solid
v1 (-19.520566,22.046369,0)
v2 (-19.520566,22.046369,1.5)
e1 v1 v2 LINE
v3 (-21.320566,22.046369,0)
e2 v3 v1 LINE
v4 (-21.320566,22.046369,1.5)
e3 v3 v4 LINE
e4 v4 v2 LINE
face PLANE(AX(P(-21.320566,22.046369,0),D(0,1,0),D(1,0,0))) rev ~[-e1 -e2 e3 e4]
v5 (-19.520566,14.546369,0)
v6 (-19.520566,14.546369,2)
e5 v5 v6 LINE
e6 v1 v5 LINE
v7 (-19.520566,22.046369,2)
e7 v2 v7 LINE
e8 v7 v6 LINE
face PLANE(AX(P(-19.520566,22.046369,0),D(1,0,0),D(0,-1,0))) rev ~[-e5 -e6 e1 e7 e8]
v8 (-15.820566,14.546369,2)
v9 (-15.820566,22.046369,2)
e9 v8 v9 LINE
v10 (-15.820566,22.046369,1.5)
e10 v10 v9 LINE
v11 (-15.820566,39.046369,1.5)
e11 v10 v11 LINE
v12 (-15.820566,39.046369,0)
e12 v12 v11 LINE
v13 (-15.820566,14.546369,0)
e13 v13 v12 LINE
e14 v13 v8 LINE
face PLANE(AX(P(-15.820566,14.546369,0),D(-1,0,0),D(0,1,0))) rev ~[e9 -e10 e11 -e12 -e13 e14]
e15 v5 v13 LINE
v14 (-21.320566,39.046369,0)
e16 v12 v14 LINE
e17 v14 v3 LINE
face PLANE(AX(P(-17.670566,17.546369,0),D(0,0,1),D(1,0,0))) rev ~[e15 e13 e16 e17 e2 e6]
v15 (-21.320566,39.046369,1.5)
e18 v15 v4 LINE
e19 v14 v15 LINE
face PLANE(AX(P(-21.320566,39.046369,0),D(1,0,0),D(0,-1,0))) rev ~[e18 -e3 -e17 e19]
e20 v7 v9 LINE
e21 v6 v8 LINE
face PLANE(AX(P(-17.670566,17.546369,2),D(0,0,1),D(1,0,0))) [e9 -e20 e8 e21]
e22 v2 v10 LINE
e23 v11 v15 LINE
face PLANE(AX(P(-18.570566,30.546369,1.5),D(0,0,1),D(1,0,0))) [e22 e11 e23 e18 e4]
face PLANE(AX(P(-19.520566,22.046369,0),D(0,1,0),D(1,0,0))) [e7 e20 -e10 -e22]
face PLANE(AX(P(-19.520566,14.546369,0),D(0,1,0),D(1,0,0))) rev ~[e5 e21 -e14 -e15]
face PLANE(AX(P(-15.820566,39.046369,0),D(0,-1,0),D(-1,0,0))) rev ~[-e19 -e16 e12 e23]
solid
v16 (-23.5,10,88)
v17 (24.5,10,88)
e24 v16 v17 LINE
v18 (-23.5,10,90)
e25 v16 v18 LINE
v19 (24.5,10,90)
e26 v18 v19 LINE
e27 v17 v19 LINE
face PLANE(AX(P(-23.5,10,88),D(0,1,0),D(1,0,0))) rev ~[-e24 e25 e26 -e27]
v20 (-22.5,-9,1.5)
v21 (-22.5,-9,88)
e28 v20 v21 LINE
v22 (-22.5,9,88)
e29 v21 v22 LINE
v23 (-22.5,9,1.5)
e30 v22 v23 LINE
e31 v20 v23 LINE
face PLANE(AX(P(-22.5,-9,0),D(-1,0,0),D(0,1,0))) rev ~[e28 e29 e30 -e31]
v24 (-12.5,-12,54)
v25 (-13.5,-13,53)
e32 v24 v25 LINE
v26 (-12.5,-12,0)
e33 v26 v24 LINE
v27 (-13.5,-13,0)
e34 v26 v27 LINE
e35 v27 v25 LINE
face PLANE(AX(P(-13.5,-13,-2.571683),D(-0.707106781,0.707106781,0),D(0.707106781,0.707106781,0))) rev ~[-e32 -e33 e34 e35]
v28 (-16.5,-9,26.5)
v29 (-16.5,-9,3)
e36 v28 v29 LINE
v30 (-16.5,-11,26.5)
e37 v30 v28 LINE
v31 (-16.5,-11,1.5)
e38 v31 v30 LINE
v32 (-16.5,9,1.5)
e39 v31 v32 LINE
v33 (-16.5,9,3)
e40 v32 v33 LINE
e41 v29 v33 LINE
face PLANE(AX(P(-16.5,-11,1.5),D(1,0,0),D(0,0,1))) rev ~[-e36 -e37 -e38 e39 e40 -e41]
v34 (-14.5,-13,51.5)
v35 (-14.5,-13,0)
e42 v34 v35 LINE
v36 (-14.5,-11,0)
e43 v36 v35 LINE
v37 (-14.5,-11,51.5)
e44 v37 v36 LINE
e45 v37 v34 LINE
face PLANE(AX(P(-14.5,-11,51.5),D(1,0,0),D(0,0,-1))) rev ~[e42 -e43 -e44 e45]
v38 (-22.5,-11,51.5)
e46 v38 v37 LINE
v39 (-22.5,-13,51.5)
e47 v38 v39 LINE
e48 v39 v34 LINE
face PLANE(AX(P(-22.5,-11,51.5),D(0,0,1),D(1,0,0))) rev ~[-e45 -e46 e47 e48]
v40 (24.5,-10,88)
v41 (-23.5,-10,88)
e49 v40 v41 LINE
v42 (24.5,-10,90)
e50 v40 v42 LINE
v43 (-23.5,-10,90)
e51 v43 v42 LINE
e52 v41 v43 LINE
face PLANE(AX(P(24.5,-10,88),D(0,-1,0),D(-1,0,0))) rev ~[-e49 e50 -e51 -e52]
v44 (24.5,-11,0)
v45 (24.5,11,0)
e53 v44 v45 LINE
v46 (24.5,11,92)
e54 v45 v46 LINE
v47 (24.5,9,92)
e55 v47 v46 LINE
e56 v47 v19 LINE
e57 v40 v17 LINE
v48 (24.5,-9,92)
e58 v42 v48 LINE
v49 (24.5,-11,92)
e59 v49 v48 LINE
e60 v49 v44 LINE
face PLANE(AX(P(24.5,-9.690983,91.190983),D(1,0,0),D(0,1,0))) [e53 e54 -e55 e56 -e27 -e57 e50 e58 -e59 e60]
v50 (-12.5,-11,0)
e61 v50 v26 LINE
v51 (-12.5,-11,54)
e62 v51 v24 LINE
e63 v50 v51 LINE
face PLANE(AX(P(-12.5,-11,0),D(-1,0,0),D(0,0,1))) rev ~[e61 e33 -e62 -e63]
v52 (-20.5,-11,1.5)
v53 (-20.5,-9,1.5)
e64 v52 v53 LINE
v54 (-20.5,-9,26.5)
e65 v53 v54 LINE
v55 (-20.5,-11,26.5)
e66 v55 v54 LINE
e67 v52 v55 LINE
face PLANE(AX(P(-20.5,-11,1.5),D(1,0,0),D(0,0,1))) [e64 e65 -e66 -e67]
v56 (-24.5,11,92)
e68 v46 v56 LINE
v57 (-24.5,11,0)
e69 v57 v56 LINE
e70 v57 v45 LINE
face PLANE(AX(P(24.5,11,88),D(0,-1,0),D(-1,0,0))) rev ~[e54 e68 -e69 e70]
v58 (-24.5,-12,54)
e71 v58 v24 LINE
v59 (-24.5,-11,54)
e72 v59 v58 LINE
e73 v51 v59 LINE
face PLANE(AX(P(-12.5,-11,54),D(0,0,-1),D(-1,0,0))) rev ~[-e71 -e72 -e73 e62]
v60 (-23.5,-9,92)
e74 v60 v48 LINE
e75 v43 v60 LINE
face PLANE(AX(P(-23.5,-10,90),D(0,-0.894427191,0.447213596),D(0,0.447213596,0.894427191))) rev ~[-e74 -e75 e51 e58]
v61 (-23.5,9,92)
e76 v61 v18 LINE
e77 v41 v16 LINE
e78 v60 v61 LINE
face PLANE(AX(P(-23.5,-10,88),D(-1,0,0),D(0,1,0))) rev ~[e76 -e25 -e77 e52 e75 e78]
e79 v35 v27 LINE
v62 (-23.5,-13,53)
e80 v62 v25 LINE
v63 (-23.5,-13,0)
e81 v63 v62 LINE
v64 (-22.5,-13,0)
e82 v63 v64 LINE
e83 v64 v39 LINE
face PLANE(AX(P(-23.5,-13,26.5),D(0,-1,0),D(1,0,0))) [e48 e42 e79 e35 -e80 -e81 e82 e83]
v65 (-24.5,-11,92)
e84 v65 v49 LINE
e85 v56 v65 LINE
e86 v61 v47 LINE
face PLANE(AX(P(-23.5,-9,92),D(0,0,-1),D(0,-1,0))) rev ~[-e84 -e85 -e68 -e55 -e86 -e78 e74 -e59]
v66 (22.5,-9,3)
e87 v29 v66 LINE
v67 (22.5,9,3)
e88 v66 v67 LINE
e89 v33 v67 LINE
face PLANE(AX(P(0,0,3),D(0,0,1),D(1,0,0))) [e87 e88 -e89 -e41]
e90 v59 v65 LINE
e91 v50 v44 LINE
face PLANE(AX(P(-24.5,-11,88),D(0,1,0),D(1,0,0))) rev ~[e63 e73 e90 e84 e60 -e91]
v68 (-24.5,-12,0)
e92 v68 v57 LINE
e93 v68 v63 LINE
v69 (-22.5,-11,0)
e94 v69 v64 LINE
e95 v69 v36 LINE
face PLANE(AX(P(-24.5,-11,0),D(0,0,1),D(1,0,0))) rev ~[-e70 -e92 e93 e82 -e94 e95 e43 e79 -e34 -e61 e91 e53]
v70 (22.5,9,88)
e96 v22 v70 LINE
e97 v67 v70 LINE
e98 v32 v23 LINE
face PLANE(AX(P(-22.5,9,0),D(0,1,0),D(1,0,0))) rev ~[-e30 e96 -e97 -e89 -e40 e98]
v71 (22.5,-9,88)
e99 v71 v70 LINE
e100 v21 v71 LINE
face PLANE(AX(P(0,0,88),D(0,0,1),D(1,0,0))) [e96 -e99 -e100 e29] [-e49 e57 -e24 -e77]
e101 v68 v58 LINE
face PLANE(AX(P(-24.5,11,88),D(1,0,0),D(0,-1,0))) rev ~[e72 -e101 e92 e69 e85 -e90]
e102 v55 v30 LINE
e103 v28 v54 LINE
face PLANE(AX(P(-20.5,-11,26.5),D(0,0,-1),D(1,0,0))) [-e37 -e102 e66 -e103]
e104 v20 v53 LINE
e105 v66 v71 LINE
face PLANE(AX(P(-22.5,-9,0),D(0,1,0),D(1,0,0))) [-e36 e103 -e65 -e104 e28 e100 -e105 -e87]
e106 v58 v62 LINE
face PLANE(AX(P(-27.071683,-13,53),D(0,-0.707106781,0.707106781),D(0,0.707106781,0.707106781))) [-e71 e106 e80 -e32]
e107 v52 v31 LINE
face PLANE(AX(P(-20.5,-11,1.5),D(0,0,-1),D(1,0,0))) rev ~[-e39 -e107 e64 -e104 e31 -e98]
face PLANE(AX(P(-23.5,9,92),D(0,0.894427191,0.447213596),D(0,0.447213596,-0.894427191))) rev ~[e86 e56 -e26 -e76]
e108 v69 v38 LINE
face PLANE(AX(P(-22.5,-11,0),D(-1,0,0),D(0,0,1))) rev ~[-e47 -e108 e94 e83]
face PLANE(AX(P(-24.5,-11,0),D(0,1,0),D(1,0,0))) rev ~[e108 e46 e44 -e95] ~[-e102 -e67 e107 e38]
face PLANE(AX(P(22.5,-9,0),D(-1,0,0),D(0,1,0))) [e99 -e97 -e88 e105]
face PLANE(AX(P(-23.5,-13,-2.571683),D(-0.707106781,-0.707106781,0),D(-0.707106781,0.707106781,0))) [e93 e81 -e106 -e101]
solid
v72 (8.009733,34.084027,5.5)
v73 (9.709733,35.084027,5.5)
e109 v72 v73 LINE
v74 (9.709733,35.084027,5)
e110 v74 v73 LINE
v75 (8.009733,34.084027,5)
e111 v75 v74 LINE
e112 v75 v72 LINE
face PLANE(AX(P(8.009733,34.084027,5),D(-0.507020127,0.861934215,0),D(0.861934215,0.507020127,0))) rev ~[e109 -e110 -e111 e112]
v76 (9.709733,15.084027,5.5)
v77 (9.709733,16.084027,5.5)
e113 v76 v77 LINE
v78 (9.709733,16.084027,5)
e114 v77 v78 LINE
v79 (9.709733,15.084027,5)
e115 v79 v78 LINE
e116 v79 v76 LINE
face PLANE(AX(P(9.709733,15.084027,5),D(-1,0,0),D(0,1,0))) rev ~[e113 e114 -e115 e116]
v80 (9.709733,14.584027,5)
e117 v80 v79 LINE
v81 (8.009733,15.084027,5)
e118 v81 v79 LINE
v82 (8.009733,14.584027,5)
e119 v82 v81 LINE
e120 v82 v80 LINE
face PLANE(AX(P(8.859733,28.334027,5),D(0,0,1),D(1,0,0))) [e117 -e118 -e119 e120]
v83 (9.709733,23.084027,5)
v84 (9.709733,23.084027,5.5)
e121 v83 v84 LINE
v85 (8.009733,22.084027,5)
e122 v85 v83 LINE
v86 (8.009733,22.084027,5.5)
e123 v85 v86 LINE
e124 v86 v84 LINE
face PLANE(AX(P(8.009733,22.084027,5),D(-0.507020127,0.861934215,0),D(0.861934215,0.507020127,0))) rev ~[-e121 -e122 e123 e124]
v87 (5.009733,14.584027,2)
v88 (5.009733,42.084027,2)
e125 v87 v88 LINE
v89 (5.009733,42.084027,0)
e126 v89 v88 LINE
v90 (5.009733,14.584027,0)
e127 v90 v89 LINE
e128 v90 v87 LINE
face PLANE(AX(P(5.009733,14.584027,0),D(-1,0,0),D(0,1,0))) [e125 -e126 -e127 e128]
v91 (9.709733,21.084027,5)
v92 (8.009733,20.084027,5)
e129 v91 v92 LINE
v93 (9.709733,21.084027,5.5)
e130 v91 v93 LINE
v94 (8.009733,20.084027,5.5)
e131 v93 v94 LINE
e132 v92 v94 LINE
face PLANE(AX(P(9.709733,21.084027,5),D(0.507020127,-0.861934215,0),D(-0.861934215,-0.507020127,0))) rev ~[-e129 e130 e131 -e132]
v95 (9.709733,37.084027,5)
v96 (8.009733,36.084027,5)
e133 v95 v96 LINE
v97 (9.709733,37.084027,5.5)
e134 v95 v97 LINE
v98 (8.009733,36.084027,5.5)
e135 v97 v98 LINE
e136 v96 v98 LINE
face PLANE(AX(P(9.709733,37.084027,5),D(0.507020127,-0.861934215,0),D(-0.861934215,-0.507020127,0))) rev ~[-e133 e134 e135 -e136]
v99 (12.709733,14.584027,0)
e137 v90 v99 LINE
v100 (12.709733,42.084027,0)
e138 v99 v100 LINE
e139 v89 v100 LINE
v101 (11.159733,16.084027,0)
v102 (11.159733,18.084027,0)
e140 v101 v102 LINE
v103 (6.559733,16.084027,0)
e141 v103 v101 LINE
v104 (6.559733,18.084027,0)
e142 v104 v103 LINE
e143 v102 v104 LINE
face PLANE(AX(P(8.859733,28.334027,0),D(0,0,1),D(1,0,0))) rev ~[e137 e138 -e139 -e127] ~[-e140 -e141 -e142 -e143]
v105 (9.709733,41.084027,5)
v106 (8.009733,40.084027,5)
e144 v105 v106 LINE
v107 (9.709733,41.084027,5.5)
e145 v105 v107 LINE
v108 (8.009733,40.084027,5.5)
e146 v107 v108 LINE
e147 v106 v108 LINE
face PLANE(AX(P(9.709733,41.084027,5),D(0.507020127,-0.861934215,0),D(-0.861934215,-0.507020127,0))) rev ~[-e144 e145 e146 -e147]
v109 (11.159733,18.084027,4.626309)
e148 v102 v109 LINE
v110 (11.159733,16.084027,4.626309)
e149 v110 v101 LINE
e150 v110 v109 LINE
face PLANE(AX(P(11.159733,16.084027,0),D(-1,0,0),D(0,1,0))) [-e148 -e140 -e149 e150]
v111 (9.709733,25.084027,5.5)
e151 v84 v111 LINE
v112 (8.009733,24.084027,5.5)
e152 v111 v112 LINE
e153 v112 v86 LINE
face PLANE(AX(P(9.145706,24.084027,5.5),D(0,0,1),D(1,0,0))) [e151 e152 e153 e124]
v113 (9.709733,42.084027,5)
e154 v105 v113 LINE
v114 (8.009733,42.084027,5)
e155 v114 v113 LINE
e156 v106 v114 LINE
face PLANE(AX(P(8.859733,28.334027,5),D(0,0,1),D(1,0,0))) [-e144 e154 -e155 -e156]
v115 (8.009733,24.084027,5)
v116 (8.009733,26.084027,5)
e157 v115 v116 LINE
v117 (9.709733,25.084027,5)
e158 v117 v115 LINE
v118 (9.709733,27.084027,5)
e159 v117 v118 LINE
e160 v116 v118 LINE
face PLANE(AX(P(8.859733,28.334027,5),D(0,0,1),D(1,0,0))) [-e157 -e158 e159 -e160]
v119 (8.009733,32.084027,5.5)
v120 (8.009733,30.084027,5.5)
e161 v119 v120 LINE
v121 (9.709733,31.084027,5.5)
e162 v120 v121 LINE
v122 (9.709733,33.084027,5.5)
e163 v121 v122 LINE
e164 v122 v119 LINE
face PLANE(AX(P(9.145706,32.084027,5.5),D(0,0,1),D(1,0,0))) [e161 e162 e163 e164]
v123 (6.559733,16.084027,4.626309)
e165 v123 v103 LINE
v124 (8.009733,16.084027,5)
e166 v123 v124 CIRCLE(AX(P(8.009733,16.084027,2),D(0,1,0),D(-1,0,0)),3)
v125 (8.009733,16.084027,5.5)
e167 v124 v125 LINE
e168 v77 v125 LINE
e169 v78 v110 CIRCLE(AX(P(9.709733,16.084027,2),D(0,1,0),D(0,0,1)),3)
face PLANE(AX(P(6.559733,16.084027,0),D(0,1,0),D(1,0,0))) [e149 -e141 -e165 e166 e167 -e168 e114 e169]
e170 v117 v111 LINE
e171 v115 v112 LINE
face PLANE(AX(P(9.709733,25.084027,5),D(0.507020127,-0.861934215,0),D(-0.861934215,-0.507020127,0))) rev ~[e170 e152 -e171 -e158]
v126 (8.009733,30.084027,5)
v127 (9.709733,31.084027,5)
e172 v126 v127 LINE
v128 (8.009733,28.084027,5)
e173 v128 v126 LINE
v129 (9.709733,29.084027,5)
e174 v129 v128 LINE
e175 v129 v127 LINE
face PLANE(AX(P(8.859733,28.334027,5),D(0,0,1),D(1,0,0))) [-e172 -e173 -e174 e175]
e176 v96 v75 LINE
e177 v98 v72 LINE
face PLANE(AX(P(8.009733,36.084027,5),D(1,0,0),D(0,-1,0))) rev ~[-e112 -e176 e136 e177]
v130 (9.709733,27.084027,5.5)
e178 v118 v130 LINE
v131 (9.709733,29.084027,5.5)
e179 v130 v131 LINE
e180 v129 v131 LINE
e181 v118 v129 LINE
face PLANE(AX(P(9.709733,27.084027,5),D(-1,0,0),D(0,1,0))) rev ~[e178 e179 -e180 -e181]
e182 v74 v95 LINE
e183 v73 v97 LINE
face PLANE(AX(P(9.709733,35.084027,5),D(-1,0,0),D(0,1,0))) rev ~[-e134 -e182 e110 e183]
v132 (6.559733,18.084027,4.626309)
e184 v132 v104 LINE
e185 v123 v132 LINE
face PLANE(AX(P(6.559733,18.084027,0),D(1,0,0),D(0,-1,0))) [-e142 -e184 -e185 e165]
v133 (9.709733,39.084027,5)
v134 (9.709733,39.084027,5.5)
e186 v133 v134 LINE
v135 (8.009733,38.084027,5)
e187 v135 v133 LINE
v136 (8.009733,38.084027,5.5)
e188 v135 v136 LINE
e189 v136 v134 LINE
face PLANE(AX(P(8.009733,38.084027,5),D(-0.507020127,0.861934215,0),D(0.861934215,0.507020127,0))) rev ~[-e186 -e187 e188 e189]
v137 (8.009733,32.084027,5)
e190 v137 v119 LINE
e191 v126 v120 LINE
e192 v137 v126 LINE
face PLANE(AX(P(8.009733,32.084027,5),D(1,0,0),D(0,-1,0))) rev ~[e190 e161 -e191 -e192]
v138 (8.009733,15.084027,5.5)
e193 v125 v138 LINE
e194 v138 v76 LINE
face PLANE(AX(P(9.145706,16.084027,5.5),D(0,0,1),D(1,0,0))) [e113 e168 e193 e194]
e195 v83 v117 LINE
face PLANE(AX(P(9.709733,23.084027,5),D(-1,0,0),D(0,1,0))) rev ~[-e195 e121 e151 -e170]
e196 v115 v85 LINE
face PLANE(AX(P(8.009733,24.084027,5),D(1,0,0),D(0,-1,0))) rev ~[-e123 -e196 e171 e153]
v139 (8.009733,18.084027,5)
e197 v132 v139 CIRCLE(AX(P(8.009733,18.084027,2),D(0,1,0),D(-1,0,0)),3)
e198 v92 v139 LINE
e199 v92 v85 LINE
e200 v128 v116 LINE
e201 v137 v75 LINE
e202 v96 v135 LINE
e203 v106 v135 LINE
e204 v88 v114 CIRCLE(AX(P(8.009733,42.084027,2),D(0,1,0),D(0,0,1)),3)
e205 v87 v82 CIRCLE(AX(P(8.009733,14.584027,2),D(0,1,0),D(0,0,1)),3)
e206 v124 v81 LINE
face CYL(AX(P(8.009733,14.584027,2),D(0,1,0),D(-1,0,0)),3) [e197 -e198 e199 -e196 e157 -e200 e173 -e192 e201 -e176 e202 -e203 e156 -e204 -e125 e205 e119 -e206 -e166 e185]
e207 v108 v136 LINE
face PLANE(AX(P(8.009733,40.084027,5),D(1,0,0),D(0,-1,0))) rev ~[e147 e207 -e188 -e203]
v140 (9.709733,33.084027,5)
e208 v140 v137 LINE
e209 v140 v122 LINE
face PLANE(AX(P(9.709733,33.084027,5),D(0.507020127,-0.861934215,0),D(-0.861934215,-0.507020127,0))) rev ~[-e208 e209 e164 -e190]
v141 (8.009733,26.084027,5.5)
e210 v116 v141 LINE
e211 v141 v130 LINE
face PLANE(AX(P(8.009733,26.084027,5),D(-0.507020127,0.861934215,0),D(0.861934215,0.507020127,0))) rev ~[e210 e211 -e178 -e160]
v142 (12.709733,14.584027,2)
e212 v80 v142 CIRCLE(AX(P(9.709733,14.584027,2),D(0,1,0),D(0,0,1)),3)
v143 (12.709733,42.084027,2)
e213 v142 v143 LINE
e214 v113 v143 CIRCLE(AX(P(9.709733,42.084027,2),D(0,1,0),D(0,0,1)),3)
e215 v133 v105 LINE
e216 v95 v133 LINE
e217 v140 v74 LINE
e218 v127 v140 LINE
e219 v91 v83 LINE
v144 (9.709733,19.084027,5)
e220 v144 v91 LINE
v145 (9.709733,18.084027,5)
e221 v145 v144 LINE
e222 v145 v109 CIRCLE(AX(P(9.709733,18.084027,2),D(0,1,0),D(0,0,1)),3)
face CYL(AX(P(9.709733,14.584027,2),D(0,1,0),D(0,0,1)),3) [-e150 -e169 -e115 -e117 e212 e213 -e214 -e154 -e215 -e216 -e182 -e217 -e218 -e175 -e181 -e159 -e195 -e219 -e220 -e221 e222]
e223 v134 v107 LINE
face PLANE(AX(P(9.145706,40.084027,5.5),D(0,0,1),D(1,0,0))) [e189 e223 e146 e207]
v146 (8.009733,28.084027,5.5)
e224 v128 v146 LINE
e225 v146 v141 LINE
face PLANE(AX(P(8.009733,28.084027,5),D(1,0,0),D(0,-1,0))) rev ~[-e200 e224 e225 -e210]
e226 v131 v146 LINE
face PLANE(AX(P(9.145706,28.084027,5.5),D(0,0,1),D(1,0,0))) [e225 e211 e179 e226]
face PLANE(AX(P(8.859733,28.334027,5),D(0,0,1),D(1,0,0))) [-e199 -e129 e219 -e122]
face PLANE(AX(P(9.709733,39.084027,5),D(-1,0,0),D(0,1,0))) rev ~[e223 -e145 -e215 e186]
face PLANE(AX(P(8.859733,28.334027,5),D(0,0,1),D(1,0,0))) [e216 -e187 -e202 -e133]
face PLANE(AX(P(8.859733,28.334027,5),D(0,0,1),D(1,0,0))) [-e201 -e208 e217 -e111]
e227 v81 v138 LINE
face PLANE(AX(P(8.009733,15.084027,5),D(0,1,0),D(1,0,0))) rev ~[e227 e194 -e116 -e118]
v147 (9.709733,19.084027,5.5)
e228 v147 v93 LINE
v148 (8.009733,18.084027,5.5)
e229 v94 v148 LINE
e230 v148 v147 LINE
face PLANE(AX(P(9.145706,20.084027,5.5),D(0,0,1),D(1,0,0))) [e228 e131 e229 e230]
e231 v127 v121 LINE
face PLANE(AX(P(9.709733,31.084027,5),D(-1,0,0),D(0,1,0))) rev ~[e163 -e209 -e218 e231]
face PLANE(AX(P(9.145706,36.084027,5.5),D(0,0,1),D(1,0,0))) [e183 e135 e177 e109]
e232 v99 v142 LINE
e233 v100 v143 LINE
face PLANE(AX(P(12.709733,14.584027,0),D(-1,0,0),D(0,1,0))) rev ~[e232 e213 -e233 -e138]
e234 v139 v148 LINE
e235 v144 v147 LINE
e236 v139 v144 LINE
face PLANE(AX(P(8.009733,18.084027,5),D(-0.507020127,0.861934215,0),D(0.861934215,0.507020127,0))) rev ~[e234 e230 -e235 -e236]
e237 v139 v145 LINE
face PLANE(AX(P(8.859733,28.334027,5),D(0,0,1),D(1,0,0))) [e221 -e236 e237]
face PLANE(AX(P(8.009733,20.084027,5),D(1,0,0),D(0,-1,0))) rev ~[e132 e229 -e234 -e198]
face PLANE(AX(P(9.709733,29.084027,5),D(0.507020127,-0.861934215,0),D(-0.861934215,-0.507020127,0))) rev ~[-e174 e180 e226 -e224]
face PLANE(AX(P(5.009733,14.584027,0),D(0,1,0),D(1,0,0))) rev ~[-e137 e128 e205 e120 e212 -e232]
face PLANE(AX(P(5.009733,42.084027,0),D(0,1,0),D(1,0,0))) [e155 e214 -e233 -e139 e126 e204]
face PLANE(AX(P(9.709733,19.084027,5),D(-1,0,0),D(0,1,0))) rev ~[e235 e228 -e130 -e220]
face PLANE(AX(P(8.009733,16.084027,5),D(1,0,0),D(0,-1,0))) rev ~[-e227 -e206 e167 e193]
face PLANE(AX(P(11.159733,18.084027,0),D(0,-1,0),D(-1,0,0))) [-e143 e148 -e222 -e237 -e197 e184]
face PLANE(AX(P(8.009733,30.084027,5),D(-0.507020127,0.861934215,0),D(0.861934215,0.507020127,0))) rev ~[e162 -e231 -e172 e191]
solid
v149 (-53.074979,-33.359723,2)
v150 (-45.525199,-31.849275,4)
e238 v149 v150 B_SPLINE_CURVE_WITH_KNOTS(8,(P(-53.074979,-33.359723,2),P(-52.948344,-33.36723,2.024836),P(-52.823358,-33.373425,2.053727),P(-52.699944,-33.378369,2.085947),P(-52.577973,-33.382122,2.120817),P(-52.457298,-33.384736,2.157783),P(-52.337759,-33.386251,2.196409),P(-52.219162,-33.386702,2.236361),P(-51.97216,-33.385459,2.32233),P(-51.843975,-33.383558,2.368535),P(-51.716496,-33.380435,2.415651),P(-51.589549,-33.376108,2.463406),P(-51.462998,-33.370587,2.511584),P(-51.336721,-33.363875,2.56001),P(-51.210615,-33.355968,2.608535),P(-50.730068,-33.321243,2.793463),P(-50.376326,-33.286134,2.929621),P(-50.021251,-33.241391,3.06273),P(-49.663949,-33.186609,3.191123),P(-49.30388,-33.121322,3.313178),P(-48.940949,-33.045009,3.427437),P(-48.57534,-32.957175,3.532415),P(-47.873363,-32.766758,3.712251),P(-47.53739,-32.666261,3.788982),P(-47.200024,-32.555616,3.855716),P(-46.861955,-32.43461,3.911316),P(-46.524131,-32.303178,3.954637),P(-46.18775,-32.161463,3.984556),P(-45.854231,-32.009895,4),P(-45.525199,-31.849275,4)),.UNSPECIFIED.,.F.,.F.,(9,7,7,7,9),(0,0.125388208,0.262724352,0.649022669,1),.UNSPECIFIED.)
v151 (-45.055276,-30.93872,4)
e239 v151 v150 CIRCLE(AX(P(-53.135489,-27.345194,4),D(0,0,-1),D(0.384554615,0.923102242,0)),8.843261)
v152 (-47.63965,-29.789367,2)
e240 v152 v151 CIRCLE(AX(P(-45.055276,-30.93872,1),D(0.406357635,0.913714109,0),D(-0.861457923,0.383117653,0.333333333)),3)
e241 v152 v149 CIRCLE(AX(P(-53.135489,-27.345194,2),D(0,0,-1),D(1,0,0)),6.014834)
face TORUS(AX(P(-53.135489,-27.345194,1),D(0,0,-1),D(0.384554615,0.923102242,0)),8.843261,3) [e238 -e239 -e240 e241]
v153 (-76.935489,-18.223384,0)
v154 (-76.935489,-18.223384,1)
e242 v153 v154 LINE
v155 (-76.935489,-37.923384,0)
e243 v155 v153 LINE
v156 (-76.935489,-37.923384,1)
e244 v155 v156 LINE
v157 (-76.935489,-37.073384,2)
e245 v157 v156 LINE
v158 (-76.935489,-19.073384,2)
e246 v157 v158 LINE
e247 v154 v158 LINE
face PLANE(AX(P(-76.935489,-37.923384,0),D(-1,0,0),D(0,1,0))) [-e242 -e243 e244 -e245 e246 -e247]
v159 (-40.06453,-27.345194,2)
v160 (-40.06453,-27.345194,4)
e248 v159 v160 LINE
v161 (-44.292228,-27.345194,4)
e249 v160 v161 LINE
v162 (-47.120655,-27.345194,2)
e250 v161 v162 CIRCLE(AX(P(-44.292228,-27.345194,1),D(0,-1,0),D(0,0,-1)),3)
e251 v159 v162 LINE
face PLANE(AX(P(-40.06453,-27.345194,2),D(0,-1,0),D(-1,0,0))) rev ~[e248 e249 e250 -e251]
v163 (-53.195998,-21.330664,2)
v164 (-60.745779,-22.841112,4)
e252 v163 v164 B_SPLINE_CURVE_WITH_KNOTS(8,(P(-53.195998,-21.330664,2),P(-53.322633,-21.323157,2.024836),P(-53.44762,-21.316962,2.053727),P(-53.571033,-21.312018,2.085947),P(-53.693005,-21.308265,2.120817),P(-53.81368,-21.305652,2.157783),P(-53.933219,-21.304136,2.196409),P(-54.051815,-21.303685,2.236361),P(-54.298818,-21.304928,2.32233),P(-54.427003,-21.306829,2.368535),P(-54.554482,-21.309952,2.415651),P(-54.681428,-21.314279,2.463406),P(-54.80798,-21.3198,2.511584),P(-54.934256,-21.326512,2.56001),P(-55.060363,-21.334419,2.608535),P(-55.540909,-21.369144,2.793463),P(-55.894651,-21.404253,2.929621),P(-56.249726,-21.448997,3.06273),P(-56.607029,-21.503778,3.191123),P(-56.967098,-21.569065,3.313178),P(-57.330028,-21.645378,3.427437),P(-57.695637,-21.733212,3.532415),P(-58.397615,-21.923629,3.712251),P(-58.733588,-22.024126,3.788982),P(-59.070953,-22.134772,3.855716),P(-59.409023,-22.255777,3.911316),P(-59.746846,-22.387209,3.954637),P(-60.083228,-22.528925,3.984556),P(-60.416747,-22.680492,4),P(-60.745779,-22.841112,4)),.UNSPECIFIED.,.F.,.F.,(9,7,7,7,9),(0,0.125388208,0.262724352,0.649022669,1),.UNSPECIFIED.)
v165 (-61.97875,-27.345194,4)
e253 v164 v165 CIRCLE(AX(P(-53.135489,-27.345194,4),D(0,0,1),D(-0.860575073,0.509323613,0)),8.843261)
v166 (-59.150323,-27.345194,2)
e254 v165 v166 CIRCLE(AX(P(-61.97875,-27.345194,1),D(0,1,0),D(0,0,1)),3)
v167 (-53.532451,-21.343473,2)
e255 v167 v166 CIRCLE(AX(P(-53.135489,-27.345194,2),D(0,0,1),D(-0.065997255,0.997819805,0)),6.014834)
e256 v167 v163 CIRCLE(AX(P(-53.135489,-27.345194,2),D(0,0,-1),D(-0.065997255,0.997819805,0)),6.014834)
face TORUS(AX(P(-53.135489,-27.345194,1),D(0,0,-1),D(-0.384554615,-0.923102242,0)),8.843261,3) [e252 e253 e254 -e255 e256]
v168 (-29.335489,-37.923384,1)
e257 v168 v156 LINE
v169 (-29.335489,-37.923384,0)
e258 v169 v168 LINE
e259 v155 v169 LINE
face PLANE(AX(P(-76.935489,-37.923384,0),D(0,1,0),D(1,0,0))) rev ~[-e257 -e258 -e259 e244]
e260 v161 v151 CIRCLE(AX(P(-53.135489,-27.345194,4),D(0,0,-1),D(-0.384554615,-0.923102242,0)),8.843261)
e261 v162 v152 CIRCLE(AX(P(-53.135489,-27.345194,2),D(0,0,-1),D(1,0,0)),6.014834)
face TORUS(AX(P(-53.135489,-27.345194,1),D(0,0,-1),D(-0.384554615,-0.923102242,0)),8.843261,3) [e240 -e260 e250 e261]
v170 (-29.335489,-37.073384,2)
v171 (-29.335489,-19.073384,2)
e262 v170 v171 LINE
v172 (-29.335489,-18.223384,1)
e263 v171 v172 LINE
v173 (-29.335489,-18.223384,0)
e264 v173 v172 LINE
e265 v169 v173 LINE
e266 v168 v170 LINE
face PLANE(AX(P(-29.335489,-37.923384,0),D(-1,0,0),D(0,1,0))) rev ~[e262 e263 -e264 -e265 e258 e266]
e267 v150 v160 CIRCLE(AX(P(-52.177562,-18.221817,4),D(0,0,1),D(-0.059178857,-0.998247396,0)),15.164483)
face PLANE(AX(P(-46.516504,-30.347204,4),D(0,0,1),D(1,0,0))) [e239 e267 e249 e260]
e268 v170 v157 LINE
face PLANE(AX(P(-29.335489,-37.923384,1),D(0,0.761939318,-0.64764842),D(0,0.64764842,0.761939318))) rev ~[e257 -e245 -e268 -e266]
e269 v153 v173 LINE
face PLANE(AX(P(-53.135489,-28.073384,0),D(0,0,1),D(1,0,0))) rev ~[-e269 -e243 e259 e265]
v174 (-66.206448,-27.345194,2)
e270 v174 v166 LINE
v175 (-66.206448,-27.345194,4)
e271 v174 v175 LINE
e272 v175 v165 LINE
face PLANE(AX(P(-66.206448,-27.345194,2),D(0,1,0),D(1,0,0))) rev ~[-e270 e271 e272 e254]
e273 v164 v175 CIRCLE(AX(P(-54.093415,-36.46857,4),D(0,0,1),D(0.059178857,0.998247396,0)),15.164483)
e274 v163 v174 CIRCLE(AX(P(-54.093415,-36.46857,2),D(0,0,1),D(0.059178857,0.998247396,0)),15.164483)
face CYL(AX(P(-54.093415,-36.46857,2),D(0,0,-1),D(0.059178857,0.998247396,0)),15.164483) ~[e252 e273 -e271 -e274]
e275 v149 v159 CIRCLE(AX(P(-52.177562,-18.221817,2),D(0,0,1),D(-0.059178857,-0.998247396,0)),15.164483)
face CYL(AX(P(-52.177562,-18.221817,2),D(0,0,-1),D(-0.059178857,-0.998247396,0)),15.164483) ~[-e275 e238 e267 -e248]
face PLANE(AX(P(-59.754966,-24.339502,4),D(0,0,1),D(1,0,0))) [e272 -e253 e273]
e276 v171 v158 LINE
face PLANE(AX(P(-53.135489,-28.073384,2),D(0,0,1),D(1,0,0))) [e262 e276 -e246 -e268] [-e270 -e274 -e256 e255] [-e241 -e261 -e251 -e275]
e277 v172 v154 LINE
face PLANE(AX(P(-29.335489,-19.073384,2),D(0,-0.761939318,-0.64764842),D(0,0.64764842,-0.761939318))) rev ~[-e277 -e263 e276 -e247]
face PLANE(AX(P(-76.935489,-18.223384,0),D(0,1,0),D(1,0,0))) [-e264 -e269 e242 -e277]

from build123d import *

# Parameters (mm, degrees)
F0_W         = 49
F0_H         = 22
F0_W_2       = 45
F0_H_2       = 18
F1_DEPTH     = 88
F2_DEPTH     = 3
F3_W         = 4
F3_H         = 25
F4_DEPTH     = 20
F5_DEPTH     = 1.5
F6_W         = 2
F6_H         = 50
F6_H_2       = 1.5
F7_DEPTH     = 2
F8_T1_DEPTH  = 17.1433659759
F8_T3_DEPTH  = 59.1433659759
F10_DEPTH    = 1.5
F9_W         = 3.7
F9_H         = 6
F9_H_2       = 1.5
F11_DEPTH    = 2
F9_W_2       = 7.7
F9_H_3       = 27.5
F12_DEPTH    = 5
F13_DEPTH    = 2.5
F14_R        = 3
F16_DEPTH    = 0.5
F18_DEPTH    = 32.1
F19_DEPTH    = 4
F21_DEPTH    = 48
F22_W        = 47.6
F22_H        = 19.7
F23_DEPTH    = 2
F25_DEPTH    = 49
F27_DEPTH    = 2
F28_T2_ANGLE = 271.3601385913
F28_T4_ANGLE = 271.3601385913


# Not quite as in the source:
# - a fillet or chamfer that OpenCascade refuses, or shapes differently, is made with other operations: its cross-section is extruded or revolved along the edge and cut away or added


with BuildPart() as f1:
    # F0 (on Top) → F1 (new body)
    with BuildSketch(Plane.XY):
        Rectangle(F0_W, F0_H)
        Rectangle(F0_W_2, F0_H_2, mode=Mode.SUBTRACT)
    extrude(amount=F1_DEPTH)

    # F0 (on Top) → F2 (join)
    with BuildSketch(Plane.XY):
        Rectangle(F0_W_2, F0_H_2)
    extrude(amount=F2_DEPTH)

    # F3 (on face) → F4 (cut)
    with BuildSketch(Plane.XZ.offset(11)):
        with Locations((-18.5, 14)):
            Rectangle(F3_W, F3_H)
    extrude(amount=-F4_DEPTH, mode=Mode.SUBTRACT)

    # F5 (cut): a face of the model
    f5_faces = [f1.faces().sort_by_distance(p)[0] for p in [
        (-21.5, 0, 3),
    ]]
    extrude(f5_faces, amount=-F5_DEPTH, mode=Mode.SUBTRACT)

    # F6 (on face) → F7 (join)
    with BuildSketch(Plane.XZ.offset(11)):
        with Locations((-23.5, 26.5)):
            Rectangle(F6_W, F6_H)
        Polygon((-24.5, 51.5), (-22.5, 51.5), (-14.5, 51.5), (-12.5, 51.5), (-12.5, 54), (-24.5, 54), align=None)
        with Locations((-13.5, 26.5)):
            Rectangle(F6_W, F6_H)
        with Locations((-23.5, 0.75)):
            Rectangle(F6_W, F6_H_2)
        with Locations((-13.5, 0.75)):
            Rectangle(F6_W, F6_H_2)
    extrude(amount=F7_DEPTH)

    # F8: chamfer of 1 on 5 edges, made by hand

    # F8_s2 → F8_t1 (cut)
    with BuildSketch(Plane.YZ.offset(-27.071682988)):
        Polygon((-13, 53), (-12, 54), (-13, 54), align=None)
    extrude(amount=F8_T1_DEPTH, mode=Mode.SUBTRACT)

    # F8_s4 → F8_t3 (cut)
    with BuildSketch(Plane.XY.offset(-2.571682988)):
        Polygon((-23.5, -13), (-24.5, -12), (-24.5, -13), align=None)
        Polygon((-13.5, -13), (-12.5, -12), (-12.5, -13), align=None)
    extrude(amount=F8_T3_DEPTH, mode=Mode.SUBTRACT)

    # F17 (on face) → F19 (join)
    with BuildSketch(Plane.XY.offset(88)):
        Polygon((-23.5, 10), (-22.5, 10), (22.5, 10), (24.5, 10), (24.5, 11), (-24.5, 11), (-24.5, -11), (24.5, -11), (24.5, -10), (22.5, -10), (-22.5, -10), (-23.5, -10), align=None)
    extrude(amount=F19_DEPTH)

    # F20 (on face) → F21 (join)
    with BuildSketch(Plane.YZ.offset(-23.5)):
        Polygon((-9, 92), (-10, 92), (-10, 90), align=None)
        Polygon((10, 92), (9, 92), (10, 90), align=None)
    extrude(amount=F21_DEPTH)


with BuildPart() as f10:
    # F9 (on Top) → F10 (new body)
    with BuildSketch(Plane.XY):
        Polygon((-15.8205656037, 22.0463685691), (-15.8205656037, 39.0463685691), (-21.3205656037, 39.0463685691), (-21.3205656037, 22.0463685691), (-19.5205656037, 22.0463685691), align=None)
    extrude(amount=F10_DEPTH)

    # F9 (on Top) → F11 (join)
    with BuildSketch(Plane.XY):
        with Locations((-17.6705656037, 17.5463685691)):
            Rectangle(F9_W, F9_H)
        with Locations((-17.6705656037, 21.2963685691)):
            Rectangle(F9_W, F9_H_2)
    extrude(amount=F11_DEPTH)


with BuildPart() as f12:
    # F9 (on Top) → F12 (new body)
    with BuildSketch(Plane.XY):
        with Locations((8.8597331405, 28.3340272307)):
            Rectangle(F9_W_2, F9_H_3)
        Polygon((11.1597331405, 16.0840272307), (8.8597331405, 16.0840272307), (6.5597331405, 16.0840272307), (6.5597331405, 18.0840272307), (11.1597331405, 18.0840272307), align=None, mode=Mode.SUBTRACT)
        Polygon((6.5597331405, 16.0840272307), (8.8597331405, 16.0840272307), (11.1597331405, 16.0840272307), (11.1597331405, 18.0840272307), (6.5597331405, 18.0840272307), align=None)
    extrude(amount=F12_DEPTH)

    # F9 (on Top) → F13 (cut)
    with BuildSketch(Plane.XY):
        Polygon((6.5597331405, 16.0840272307), (8.8597331405, 16.0840272307), (11.1597331405, 16.0840272307), (11.1597331405, 18.0840272307), (6.5597331405, 18.0840272307), align=None)
    extrude(amount=F13_DEPTH, mode=Mode.SUBTRACT)

    # F14
    f14_edges = [f12.edges().sort_by_distance(p)[0] for p in [
        (5.009733, 28.334027, 5),
        (12.709733, 28.334027, 5),
    ]]
    fillet(f14_edges, radius=F14_R)

    # F15 (on face) → F16 (join)
    with BuildSketch(Plane.XY.offset(5)):
        Polygon((9.7097331405, 39.0840272307), (9.7097331405, 41.0840272307), (8.0097331405, 40.0840272307), align=None)
        Polygon((9.7097331405, 39.0840272307), (8.0097331405, 40.0840272307), (8.0097331405, 39.0840272307), (8.0097331405, 38.0840272307), align=None)
        Polygon((9.7097331405, 35.0840272307), (9.7097331405, 37.0840272307), (8.0097331405, 36.0840272307), align=None)
        Polygon((9.7097331405, 35.0840272307), (8.0097331405, 36.0840272307), (8.0097331405, 35.0840272307), (8.0097331405, 34.0840272307), align=None)
        Polygon((9.7097331405, 31.0840272307), (9.7097331405, 33.0840272307), (8.0097331405, 32.0840272307), align=None)
        Polygon((9.7097331405, 31.0840272307), (8.0097331405, 32.0840272307), (8.0097331405, 31.0840272307), (8.0097331405, 30.0840272307), align=None)
        Polygon((9.7097331405, 27.0840272307), (9.7097331405, 29.0840272307), (8.0097331405, 28.0840272307), align=None)
        Polygon((9.7097331405, 27.0840272307), (8.0097331405, 28.0840272307), (8.0097331405, 27.0840272307), (8.0097331405, 26.0840272307), align=None)
        Polygon((9.7097331405, 23.0840272307), (9.7097331405, 25.0840272307), (8.0097331405, 24.0840272307), align=None)
        Polygon((9.7097331405, 23.0840272307), (8.0097331405, 24.0840272307), (8.0097331405, 23.0840272307), (8.0097331405, 22.0840272307), align=None)
        Polygon((9.7097331405, 19.0840272307), (9.7097331405, 21.0840272307), (8.0097331405, 20.0840272307), align=None)
        Polygon((9.7097331405, 19.0840272307), (8.0097331405, 20.0840272307), (8.0097331405, 19.0840272307), (8.0097331405, 18.0840272307), align=None)
        Polygon((9.7097331405, 15.0840272307), (9.7097331405, 17.0840272307), (8.0097331405, 16.0840272307), align=None)
        Polygon((9.7097331405, 15.0840272307), (8.0097331405, 16.0840272307), (8.0097331405, 15.0840272307), align=None)
    extrude(amount=F16_DEPTH)

    # F9 (on Top) → F18 (cut)
    with BuildSketch(Plane.XY):
        Polygon((6.5597331405, 16.0840272307), (8.8597331405, 16.0840272307), (11.1597331405, 16.0840272307), (11.1597331405, 18.0840272307), (6.5597331405, 18.0840272307), align=None)
    extrude(amount=F18_DEPTH, mode=Mode.SUBTRACT)


with BuildPart() as f23:
    # F22 (on Top) → F23 (new body)
    with BuildSketch(Plane.XY):
        with Locations((-53.1354887307, -28.0733844578)):
            Rectangle(F22_W, F22_H)
    extrude(amount=F23_DEPTH)

    # F24 (on face) → F25 (cut)
    with BuildSketch(Plane.YZ.offset(-29.3354887307)):
        Polygon((-37.9233844578, 1), (-37.0733844578, 2), (-37.9233844578, 2), align=None)
        Polygon((-18.2233844578, 2), (-19.0733844578, 2), (-18.2233844578, 1), align=None)
    extrude(amount=-F25_DEPTH, mode=Mode.SUBTRACT)

    # F26 (on face) → F27 (join)
    with BuildSketch(Plane.XY.offset(2)):
        with BuildLine():
            ThreePointArc((-53.195998495, -21.3306639587), (-60.4566809918, -22.7037450747), (-66.2064477801, -27.34519355))
            Line((-66.2064477801, -27.34519355), (-59.1503226965, -27.34519355))
            ThreePointArc((-59.1503226965, -27.34519355), (-57.5267238276, -23.2348064685), (-53.532451262, -21.3434730979))
            ThreePointArc((-53.532451262, -21.3434730979), (-53.3643145243, -21.334713836), (-53.195998495, -21.3306639587))
        make_face()
        with BuildLine():
            ThreePointArc((-47.1206547649, -27.34519355), (-48.8610189494, -31.5768759253), (-53.0749789663, -33.3597231413))
            ThreePointArc((-53.0749789663, -33.3597231413), (-45.8142964696, -31.9866420253), (-40.0645296812, -27.34519355))
            Line((-40.0645296812, -27.34519355), (-47.1206547649, -27.34519355))
        make_face()
    extrude(amount=F27_DEPTH)

    # F28: fillet of radius 3 on 2 edges, made by hand

    # F28_s1 → F28_t2 (revolve, cut)
    with BuildSketch(Plane(origin=(-35.5706079716, 14.8183384522, 0), x_dir=(0, 0, 1), z_dir=(0.9231022415, -0.3845546146, 0))):
        with BuildLine():
            ThreePointArc((2, 51.6907408203), (3.4494897428, 52.7871171375), (4, 54.519167945))
            Line((4, 54.519167945), (4, 51.6907408203))
            Line((4, 51.6907408203), (2, 51.6907408203))
        make_face()
    revolve(axis=Axis((-53.1354887307, -27.34519355, 4), (0, 0, -1)), revolution_arc=F28_T2_ANGLE, mode=Mode.SUBTRACT)

    # F28_s3 → F28_t4 (revolve, cut)
    with BuildSketch(Plane(origin=(-35.5706079716, 14.8183384522, 0), x_dir=(0, 0, 1), z_dir=(-0.9231022415, 0.3845546146, 0))):
        with BuildLine():
            ThreePointArc((2, -39.6610728887), (3.4494897428, -38.5646965715), (4, -36.8326457639))
            Line((4, -36.8326457639), (4, -39.6610728887))
            Line((4, -39.6610728887), (2, -39.6610728887))
        make_face()
    revolve(axis=Axis((-53.1354887307, -27.34519355, 4), (0, 0, -1)), revolution_arc=F28_T4_ANGLE, mode=Mode.SUBTRACT)


solid = Compound([f1.part, f10.part, f12.part, f23.part])
